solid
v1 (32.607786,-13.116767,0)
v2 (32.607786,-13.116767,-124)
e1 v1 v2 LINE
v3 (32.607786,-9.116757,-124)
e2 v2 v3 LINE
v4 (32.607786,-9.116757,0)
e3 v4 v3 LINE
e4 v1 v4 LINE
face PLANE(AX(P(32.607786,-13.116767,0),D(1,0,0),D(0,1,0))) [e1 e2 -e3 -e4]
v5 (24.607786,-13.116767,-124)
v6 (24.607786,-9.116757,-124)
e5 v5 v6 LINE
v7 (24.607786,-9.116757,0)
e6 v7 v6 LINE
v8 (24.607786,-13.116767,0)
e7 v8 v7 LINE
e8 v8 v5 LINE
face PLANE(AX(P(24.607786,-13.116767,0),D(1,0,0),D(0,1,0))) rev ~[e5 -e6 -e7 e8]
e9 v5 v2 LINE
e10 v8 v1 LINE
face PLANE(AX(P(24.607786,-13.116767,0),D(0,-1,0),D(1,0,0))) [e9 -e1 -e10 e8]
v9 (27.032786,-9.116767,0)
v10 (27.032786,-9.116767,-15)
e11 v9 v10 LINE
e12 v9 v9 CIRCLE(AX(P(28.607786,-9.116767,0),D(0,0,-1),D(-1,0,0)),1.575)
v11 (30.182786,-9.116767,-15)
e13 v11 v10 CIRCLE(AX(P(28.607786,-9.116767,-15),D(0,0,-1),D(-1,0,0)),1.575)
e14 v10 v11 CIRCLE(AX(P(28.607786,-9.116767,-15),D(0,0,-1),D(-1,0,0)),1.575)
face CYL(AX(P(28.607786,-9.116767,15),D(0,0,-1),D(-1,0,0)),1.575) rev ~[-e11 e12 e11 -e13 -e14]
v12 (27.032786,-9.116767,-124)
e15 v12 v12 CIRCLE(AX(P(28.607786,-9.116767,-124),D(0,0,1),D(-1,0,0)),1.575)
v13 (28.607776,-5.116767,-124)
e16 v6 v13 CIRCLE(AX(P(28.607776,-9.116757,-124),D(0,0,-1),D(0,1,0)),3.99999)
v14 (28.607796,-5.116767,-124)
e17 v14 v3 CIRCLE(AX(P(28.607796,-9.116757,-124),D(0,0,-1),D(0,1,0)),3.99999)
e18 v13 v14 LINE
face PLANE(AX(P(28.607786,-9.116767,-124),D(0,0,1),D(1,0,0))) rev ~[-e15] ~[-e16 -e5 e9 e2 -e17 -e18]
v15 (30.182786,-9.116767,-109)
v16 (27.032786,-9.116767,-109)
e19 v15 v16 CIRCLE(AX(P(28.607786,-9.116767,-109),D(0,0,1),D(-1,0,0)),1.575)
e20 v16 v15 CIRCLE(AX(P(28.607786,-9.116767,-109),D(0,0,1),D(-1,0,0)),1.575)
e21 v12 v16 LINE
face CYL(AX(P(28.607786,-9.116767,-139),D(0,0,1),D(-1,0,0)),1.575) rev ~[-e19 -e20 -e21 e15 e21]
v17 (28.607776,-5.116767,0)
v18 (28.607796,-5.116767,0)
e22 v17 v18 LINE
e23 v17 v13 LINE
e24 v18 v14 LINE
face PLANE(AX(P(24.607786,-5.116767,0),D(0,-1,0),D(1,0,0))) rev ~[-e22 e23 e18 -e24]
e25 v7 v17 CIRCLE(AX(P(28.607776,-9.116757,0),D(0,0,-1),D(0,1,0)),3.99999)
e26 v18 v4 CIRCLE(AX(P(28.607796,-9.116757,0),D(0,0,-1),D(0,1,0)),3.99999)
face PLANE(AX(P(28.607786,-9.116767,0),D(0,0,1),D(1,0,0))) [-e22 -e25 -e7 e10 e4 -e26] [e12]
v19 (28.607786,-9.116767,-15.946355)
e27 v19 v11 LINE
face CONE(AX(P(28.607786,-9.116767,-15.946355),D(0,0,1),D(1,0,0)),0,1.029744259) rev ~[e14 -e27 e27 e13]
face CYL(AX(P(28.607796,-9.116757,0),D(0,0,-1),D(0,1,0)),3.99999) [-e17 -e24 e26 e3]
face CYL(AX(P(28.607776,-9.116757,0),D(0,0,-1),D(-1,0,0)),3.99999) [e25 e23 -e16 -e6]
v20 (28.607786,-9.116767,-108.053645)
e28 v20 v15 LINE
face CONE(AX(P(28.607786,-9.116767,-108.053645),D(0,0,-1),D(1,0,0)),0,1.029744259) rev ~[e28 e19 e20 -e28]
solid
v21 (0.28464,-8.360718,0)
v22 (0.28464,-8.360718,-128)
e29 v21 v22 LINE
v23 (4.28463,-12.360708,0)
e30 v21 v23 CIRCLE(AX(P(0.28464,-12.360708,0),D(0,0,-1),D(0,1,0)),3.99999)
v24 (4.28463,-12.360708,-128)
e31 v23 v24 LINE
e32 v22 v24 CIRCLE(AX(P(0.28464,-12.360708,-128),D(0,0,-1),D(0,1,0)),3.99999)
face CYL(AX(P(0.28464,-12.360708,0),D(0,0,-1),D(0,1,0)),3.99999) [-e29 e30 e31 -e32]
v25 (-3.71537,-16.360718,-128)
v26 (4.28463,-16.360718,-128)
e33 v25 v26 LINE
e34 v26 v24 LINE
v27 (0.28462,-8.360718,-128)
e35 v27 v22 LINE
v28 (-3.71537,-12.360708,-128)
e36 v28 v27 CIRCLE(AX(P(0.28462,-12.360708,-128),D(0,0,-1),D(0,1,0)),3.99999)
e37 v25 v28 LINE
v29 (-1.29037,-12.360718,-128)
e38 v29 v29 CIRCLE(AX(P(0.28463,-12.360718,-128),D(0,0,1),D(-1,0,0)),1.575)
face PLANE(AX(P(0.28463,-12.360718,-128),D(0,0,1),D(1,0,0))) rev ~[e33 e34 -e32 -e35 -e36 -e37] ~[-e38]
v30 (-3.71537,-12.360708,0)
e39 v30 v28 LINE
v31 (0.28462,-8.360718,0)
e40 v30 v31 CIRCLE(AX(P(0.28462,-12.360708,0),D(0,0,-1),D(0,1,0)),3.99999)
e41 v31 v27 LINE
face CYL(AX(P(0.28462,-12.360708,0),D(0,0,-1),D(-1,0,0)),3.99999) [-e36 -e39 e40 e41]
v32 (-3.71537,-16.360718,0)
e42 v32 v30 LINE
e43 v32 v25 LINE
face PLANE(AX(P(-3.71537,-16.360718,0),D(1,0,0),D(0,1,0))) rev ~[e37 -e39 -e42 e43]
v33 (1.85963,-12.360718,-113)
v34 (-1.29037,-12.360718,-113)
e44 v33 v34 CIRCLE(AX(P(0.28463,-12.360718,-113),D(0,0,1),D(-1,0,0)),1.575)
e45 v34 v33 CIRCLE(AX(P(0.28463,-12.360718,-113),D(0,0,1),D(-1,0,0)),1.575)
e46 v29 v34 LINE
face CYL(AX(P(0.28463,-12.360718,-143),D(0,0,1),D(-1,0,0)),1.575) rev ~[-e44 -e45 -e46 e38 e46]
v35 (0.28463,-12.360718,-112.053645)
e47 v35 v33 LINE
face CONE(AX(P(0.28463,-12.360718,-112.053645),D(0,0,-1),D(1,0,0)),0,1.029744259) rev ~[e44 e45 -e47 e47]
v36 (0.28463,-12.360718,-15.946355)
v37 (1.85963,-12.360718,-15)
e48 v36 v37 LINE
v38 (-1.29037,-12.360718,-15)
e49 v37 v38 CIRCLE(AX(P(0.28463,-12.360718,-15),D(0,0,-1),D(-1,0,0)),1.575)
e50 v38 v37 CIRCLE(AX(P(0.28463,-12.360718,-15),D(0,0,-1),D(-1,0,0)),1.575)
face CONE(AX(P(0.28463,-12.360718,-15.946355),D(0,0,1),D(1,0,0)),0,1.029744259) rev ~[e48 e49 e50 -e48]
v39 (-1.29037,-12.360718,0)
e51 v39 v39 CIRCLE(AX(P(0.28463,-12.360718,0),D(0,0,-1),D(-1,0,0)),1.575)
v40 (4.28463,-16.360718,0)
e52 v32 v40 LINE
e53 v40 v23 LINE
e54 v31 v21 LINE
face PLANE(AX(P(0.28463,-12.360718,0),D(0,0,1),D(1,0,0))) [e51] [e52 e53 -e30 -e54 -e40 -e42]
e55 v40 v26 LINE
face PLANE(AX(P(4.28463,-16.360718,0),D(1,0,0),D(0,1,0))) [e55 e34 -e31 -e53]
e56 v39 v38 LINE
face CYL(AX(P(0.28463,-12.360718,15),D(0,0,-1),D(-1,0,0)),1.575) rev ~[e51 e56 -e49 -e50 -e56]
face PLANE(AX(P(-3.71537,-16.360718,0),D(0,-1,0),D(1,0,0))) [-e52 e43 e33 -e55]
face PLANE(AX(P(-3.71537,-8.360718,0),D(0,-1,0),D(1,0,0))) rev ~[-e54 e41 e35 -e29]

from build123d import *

# Parameters (mm, degrees)
F0_W           = 8
F0_H           = 8
F1_DEPTH       = 128
F2_DEPTH       = 124
F5_D           = 3.15
F5_DEPTH       = 15
F5_TIP         = 0.946355475
F5_2_D         = 3.15
F5_2_DEPTH     = 15
F5_2_TIP       = 0.946355475
F5_ON_F3_D     = 3.15
F5_ON_F3_DEPTH = 15
F5_ON_F3_TIP   = 0.946355475
F5_ON_F4_D     = 3.15
F5_ON_F4_DEPTH = 15
F5_ON_F4_TIP   = 0.946355475
F6_R           = 3.99999
F6_2_R         = 3.99999


# Not quite as in the source:
# - a fillet or chamfer is up to 0.001 mm smaller than in the source, because OpenCascade refuses the exact size


with BuildPart() as f1:
    # F0 (on Top) → F1 (new body)
    with BuildSketch(Plane.XY):
        with Locations((0.2846295983, -12.3607183769)):
            Rectangle(F0_W, F0_H)
    extrude(amount=-F1_DEPTH)

    # F5
    with Locations(Plane.XY):
        with Locations((0.2846295983, -12.3607183769), (28.6077857018, -9.1167669743)):
            Hole(F5_D / 2, depth=F5_DEPTH)
            with Locations((0, 0, -(F5_DEPTH + F5_TIP / 2))):  # 118° drill point
                Cone(0, F5_D / 2, F5_TIP, mode=Mode.SUBTRACT)

    # F5 on F3
    with Locations(Plane(origin=(0, 0, -128), x_dir=(1, 0, 0), z_dir=(0, 0, -1))):
        with Locations((0.2846295983, 12.3607183769)):
            Hole(F5_ON_F3_D / 2, depth=F5_ON_F3_DEPTH)
            with Locations((0, 0, -(F5_ON_F3_DEPTH + F5_ON_F3_TIP / 2))):  # 118° drill point
                Cone(0, F5_ON_F3_D / 2, F5_ON_F3_TIP, mode=Mode.SUBTRACT)

    # F6 (radius 4 in the source; OpenCascade refuses exactly that, so slightly less here)
    f6_edges = [f1.edges().sort_by_distance(p)[0] for p in [
        (-3.71537, -8.360718, -64),
        (4.28463, -8.360718, -64),
    ]]
    fillet(f6_edges, radius=F6_R)


with BuildPart() as f2:
    # F0 (on Top) → F2 (new body)
    with BuildSketch(Plane.XY):
        with Locations((28.6077857018, -9.1167669743)):
            Rectangle(F0_W, F0_H)
    extrude(amount=-F2_DEPTH)

    # F5#2
    with Locations(Plane.XY):
        with Locations((0.2846295983, -12.3607183769), (28.6077857018, -9.1167669743)):
            Hole(F5_2_D / 2, depth=F5_2_DEPTH)
            with Locations((0, 0, -(F5_2_DEPTH + F5_2_TIP / 2))):  # 118° drill point
                Cone(0, F5_2_D / 2, F5_2_TIP, mode=Mode.SUBTRACT)

    # F5 on F4
    with Locations(Plane(origin=(0, 0, -124), x_dir=(1, 0, 0), z_dir=(0, 0, -1))):
        with Locations((28.6077857018, 9.1167669743)):
            Hole(F5_ON_F4_D / 2, depth=F5_ON_F4_DEPTH)
            with Locations((0, 0, -(F5_ON_F4_DEPTH + F5_ON_F4_TIP / 2))):  # 118° drill point
                Cone(0, F5_ON_F4_D / 2, F5_ON_F4_TIP, mode=Mode.SUBTRACT)

    # F6#2 (radius 4 in the source; OpenCascade refuses exactly that, so slightly less here)
    f6_2_edges = [f2.edges().sort_by_distance(p)[0] for p in [
        (24.607786, -5.116767, -62),
        (32.607786, -5.116767, -62),
    ]]
    fillet(f6_2_edges, radius=F6_2_R)


solid = Compound([f1.part, f2.part])
